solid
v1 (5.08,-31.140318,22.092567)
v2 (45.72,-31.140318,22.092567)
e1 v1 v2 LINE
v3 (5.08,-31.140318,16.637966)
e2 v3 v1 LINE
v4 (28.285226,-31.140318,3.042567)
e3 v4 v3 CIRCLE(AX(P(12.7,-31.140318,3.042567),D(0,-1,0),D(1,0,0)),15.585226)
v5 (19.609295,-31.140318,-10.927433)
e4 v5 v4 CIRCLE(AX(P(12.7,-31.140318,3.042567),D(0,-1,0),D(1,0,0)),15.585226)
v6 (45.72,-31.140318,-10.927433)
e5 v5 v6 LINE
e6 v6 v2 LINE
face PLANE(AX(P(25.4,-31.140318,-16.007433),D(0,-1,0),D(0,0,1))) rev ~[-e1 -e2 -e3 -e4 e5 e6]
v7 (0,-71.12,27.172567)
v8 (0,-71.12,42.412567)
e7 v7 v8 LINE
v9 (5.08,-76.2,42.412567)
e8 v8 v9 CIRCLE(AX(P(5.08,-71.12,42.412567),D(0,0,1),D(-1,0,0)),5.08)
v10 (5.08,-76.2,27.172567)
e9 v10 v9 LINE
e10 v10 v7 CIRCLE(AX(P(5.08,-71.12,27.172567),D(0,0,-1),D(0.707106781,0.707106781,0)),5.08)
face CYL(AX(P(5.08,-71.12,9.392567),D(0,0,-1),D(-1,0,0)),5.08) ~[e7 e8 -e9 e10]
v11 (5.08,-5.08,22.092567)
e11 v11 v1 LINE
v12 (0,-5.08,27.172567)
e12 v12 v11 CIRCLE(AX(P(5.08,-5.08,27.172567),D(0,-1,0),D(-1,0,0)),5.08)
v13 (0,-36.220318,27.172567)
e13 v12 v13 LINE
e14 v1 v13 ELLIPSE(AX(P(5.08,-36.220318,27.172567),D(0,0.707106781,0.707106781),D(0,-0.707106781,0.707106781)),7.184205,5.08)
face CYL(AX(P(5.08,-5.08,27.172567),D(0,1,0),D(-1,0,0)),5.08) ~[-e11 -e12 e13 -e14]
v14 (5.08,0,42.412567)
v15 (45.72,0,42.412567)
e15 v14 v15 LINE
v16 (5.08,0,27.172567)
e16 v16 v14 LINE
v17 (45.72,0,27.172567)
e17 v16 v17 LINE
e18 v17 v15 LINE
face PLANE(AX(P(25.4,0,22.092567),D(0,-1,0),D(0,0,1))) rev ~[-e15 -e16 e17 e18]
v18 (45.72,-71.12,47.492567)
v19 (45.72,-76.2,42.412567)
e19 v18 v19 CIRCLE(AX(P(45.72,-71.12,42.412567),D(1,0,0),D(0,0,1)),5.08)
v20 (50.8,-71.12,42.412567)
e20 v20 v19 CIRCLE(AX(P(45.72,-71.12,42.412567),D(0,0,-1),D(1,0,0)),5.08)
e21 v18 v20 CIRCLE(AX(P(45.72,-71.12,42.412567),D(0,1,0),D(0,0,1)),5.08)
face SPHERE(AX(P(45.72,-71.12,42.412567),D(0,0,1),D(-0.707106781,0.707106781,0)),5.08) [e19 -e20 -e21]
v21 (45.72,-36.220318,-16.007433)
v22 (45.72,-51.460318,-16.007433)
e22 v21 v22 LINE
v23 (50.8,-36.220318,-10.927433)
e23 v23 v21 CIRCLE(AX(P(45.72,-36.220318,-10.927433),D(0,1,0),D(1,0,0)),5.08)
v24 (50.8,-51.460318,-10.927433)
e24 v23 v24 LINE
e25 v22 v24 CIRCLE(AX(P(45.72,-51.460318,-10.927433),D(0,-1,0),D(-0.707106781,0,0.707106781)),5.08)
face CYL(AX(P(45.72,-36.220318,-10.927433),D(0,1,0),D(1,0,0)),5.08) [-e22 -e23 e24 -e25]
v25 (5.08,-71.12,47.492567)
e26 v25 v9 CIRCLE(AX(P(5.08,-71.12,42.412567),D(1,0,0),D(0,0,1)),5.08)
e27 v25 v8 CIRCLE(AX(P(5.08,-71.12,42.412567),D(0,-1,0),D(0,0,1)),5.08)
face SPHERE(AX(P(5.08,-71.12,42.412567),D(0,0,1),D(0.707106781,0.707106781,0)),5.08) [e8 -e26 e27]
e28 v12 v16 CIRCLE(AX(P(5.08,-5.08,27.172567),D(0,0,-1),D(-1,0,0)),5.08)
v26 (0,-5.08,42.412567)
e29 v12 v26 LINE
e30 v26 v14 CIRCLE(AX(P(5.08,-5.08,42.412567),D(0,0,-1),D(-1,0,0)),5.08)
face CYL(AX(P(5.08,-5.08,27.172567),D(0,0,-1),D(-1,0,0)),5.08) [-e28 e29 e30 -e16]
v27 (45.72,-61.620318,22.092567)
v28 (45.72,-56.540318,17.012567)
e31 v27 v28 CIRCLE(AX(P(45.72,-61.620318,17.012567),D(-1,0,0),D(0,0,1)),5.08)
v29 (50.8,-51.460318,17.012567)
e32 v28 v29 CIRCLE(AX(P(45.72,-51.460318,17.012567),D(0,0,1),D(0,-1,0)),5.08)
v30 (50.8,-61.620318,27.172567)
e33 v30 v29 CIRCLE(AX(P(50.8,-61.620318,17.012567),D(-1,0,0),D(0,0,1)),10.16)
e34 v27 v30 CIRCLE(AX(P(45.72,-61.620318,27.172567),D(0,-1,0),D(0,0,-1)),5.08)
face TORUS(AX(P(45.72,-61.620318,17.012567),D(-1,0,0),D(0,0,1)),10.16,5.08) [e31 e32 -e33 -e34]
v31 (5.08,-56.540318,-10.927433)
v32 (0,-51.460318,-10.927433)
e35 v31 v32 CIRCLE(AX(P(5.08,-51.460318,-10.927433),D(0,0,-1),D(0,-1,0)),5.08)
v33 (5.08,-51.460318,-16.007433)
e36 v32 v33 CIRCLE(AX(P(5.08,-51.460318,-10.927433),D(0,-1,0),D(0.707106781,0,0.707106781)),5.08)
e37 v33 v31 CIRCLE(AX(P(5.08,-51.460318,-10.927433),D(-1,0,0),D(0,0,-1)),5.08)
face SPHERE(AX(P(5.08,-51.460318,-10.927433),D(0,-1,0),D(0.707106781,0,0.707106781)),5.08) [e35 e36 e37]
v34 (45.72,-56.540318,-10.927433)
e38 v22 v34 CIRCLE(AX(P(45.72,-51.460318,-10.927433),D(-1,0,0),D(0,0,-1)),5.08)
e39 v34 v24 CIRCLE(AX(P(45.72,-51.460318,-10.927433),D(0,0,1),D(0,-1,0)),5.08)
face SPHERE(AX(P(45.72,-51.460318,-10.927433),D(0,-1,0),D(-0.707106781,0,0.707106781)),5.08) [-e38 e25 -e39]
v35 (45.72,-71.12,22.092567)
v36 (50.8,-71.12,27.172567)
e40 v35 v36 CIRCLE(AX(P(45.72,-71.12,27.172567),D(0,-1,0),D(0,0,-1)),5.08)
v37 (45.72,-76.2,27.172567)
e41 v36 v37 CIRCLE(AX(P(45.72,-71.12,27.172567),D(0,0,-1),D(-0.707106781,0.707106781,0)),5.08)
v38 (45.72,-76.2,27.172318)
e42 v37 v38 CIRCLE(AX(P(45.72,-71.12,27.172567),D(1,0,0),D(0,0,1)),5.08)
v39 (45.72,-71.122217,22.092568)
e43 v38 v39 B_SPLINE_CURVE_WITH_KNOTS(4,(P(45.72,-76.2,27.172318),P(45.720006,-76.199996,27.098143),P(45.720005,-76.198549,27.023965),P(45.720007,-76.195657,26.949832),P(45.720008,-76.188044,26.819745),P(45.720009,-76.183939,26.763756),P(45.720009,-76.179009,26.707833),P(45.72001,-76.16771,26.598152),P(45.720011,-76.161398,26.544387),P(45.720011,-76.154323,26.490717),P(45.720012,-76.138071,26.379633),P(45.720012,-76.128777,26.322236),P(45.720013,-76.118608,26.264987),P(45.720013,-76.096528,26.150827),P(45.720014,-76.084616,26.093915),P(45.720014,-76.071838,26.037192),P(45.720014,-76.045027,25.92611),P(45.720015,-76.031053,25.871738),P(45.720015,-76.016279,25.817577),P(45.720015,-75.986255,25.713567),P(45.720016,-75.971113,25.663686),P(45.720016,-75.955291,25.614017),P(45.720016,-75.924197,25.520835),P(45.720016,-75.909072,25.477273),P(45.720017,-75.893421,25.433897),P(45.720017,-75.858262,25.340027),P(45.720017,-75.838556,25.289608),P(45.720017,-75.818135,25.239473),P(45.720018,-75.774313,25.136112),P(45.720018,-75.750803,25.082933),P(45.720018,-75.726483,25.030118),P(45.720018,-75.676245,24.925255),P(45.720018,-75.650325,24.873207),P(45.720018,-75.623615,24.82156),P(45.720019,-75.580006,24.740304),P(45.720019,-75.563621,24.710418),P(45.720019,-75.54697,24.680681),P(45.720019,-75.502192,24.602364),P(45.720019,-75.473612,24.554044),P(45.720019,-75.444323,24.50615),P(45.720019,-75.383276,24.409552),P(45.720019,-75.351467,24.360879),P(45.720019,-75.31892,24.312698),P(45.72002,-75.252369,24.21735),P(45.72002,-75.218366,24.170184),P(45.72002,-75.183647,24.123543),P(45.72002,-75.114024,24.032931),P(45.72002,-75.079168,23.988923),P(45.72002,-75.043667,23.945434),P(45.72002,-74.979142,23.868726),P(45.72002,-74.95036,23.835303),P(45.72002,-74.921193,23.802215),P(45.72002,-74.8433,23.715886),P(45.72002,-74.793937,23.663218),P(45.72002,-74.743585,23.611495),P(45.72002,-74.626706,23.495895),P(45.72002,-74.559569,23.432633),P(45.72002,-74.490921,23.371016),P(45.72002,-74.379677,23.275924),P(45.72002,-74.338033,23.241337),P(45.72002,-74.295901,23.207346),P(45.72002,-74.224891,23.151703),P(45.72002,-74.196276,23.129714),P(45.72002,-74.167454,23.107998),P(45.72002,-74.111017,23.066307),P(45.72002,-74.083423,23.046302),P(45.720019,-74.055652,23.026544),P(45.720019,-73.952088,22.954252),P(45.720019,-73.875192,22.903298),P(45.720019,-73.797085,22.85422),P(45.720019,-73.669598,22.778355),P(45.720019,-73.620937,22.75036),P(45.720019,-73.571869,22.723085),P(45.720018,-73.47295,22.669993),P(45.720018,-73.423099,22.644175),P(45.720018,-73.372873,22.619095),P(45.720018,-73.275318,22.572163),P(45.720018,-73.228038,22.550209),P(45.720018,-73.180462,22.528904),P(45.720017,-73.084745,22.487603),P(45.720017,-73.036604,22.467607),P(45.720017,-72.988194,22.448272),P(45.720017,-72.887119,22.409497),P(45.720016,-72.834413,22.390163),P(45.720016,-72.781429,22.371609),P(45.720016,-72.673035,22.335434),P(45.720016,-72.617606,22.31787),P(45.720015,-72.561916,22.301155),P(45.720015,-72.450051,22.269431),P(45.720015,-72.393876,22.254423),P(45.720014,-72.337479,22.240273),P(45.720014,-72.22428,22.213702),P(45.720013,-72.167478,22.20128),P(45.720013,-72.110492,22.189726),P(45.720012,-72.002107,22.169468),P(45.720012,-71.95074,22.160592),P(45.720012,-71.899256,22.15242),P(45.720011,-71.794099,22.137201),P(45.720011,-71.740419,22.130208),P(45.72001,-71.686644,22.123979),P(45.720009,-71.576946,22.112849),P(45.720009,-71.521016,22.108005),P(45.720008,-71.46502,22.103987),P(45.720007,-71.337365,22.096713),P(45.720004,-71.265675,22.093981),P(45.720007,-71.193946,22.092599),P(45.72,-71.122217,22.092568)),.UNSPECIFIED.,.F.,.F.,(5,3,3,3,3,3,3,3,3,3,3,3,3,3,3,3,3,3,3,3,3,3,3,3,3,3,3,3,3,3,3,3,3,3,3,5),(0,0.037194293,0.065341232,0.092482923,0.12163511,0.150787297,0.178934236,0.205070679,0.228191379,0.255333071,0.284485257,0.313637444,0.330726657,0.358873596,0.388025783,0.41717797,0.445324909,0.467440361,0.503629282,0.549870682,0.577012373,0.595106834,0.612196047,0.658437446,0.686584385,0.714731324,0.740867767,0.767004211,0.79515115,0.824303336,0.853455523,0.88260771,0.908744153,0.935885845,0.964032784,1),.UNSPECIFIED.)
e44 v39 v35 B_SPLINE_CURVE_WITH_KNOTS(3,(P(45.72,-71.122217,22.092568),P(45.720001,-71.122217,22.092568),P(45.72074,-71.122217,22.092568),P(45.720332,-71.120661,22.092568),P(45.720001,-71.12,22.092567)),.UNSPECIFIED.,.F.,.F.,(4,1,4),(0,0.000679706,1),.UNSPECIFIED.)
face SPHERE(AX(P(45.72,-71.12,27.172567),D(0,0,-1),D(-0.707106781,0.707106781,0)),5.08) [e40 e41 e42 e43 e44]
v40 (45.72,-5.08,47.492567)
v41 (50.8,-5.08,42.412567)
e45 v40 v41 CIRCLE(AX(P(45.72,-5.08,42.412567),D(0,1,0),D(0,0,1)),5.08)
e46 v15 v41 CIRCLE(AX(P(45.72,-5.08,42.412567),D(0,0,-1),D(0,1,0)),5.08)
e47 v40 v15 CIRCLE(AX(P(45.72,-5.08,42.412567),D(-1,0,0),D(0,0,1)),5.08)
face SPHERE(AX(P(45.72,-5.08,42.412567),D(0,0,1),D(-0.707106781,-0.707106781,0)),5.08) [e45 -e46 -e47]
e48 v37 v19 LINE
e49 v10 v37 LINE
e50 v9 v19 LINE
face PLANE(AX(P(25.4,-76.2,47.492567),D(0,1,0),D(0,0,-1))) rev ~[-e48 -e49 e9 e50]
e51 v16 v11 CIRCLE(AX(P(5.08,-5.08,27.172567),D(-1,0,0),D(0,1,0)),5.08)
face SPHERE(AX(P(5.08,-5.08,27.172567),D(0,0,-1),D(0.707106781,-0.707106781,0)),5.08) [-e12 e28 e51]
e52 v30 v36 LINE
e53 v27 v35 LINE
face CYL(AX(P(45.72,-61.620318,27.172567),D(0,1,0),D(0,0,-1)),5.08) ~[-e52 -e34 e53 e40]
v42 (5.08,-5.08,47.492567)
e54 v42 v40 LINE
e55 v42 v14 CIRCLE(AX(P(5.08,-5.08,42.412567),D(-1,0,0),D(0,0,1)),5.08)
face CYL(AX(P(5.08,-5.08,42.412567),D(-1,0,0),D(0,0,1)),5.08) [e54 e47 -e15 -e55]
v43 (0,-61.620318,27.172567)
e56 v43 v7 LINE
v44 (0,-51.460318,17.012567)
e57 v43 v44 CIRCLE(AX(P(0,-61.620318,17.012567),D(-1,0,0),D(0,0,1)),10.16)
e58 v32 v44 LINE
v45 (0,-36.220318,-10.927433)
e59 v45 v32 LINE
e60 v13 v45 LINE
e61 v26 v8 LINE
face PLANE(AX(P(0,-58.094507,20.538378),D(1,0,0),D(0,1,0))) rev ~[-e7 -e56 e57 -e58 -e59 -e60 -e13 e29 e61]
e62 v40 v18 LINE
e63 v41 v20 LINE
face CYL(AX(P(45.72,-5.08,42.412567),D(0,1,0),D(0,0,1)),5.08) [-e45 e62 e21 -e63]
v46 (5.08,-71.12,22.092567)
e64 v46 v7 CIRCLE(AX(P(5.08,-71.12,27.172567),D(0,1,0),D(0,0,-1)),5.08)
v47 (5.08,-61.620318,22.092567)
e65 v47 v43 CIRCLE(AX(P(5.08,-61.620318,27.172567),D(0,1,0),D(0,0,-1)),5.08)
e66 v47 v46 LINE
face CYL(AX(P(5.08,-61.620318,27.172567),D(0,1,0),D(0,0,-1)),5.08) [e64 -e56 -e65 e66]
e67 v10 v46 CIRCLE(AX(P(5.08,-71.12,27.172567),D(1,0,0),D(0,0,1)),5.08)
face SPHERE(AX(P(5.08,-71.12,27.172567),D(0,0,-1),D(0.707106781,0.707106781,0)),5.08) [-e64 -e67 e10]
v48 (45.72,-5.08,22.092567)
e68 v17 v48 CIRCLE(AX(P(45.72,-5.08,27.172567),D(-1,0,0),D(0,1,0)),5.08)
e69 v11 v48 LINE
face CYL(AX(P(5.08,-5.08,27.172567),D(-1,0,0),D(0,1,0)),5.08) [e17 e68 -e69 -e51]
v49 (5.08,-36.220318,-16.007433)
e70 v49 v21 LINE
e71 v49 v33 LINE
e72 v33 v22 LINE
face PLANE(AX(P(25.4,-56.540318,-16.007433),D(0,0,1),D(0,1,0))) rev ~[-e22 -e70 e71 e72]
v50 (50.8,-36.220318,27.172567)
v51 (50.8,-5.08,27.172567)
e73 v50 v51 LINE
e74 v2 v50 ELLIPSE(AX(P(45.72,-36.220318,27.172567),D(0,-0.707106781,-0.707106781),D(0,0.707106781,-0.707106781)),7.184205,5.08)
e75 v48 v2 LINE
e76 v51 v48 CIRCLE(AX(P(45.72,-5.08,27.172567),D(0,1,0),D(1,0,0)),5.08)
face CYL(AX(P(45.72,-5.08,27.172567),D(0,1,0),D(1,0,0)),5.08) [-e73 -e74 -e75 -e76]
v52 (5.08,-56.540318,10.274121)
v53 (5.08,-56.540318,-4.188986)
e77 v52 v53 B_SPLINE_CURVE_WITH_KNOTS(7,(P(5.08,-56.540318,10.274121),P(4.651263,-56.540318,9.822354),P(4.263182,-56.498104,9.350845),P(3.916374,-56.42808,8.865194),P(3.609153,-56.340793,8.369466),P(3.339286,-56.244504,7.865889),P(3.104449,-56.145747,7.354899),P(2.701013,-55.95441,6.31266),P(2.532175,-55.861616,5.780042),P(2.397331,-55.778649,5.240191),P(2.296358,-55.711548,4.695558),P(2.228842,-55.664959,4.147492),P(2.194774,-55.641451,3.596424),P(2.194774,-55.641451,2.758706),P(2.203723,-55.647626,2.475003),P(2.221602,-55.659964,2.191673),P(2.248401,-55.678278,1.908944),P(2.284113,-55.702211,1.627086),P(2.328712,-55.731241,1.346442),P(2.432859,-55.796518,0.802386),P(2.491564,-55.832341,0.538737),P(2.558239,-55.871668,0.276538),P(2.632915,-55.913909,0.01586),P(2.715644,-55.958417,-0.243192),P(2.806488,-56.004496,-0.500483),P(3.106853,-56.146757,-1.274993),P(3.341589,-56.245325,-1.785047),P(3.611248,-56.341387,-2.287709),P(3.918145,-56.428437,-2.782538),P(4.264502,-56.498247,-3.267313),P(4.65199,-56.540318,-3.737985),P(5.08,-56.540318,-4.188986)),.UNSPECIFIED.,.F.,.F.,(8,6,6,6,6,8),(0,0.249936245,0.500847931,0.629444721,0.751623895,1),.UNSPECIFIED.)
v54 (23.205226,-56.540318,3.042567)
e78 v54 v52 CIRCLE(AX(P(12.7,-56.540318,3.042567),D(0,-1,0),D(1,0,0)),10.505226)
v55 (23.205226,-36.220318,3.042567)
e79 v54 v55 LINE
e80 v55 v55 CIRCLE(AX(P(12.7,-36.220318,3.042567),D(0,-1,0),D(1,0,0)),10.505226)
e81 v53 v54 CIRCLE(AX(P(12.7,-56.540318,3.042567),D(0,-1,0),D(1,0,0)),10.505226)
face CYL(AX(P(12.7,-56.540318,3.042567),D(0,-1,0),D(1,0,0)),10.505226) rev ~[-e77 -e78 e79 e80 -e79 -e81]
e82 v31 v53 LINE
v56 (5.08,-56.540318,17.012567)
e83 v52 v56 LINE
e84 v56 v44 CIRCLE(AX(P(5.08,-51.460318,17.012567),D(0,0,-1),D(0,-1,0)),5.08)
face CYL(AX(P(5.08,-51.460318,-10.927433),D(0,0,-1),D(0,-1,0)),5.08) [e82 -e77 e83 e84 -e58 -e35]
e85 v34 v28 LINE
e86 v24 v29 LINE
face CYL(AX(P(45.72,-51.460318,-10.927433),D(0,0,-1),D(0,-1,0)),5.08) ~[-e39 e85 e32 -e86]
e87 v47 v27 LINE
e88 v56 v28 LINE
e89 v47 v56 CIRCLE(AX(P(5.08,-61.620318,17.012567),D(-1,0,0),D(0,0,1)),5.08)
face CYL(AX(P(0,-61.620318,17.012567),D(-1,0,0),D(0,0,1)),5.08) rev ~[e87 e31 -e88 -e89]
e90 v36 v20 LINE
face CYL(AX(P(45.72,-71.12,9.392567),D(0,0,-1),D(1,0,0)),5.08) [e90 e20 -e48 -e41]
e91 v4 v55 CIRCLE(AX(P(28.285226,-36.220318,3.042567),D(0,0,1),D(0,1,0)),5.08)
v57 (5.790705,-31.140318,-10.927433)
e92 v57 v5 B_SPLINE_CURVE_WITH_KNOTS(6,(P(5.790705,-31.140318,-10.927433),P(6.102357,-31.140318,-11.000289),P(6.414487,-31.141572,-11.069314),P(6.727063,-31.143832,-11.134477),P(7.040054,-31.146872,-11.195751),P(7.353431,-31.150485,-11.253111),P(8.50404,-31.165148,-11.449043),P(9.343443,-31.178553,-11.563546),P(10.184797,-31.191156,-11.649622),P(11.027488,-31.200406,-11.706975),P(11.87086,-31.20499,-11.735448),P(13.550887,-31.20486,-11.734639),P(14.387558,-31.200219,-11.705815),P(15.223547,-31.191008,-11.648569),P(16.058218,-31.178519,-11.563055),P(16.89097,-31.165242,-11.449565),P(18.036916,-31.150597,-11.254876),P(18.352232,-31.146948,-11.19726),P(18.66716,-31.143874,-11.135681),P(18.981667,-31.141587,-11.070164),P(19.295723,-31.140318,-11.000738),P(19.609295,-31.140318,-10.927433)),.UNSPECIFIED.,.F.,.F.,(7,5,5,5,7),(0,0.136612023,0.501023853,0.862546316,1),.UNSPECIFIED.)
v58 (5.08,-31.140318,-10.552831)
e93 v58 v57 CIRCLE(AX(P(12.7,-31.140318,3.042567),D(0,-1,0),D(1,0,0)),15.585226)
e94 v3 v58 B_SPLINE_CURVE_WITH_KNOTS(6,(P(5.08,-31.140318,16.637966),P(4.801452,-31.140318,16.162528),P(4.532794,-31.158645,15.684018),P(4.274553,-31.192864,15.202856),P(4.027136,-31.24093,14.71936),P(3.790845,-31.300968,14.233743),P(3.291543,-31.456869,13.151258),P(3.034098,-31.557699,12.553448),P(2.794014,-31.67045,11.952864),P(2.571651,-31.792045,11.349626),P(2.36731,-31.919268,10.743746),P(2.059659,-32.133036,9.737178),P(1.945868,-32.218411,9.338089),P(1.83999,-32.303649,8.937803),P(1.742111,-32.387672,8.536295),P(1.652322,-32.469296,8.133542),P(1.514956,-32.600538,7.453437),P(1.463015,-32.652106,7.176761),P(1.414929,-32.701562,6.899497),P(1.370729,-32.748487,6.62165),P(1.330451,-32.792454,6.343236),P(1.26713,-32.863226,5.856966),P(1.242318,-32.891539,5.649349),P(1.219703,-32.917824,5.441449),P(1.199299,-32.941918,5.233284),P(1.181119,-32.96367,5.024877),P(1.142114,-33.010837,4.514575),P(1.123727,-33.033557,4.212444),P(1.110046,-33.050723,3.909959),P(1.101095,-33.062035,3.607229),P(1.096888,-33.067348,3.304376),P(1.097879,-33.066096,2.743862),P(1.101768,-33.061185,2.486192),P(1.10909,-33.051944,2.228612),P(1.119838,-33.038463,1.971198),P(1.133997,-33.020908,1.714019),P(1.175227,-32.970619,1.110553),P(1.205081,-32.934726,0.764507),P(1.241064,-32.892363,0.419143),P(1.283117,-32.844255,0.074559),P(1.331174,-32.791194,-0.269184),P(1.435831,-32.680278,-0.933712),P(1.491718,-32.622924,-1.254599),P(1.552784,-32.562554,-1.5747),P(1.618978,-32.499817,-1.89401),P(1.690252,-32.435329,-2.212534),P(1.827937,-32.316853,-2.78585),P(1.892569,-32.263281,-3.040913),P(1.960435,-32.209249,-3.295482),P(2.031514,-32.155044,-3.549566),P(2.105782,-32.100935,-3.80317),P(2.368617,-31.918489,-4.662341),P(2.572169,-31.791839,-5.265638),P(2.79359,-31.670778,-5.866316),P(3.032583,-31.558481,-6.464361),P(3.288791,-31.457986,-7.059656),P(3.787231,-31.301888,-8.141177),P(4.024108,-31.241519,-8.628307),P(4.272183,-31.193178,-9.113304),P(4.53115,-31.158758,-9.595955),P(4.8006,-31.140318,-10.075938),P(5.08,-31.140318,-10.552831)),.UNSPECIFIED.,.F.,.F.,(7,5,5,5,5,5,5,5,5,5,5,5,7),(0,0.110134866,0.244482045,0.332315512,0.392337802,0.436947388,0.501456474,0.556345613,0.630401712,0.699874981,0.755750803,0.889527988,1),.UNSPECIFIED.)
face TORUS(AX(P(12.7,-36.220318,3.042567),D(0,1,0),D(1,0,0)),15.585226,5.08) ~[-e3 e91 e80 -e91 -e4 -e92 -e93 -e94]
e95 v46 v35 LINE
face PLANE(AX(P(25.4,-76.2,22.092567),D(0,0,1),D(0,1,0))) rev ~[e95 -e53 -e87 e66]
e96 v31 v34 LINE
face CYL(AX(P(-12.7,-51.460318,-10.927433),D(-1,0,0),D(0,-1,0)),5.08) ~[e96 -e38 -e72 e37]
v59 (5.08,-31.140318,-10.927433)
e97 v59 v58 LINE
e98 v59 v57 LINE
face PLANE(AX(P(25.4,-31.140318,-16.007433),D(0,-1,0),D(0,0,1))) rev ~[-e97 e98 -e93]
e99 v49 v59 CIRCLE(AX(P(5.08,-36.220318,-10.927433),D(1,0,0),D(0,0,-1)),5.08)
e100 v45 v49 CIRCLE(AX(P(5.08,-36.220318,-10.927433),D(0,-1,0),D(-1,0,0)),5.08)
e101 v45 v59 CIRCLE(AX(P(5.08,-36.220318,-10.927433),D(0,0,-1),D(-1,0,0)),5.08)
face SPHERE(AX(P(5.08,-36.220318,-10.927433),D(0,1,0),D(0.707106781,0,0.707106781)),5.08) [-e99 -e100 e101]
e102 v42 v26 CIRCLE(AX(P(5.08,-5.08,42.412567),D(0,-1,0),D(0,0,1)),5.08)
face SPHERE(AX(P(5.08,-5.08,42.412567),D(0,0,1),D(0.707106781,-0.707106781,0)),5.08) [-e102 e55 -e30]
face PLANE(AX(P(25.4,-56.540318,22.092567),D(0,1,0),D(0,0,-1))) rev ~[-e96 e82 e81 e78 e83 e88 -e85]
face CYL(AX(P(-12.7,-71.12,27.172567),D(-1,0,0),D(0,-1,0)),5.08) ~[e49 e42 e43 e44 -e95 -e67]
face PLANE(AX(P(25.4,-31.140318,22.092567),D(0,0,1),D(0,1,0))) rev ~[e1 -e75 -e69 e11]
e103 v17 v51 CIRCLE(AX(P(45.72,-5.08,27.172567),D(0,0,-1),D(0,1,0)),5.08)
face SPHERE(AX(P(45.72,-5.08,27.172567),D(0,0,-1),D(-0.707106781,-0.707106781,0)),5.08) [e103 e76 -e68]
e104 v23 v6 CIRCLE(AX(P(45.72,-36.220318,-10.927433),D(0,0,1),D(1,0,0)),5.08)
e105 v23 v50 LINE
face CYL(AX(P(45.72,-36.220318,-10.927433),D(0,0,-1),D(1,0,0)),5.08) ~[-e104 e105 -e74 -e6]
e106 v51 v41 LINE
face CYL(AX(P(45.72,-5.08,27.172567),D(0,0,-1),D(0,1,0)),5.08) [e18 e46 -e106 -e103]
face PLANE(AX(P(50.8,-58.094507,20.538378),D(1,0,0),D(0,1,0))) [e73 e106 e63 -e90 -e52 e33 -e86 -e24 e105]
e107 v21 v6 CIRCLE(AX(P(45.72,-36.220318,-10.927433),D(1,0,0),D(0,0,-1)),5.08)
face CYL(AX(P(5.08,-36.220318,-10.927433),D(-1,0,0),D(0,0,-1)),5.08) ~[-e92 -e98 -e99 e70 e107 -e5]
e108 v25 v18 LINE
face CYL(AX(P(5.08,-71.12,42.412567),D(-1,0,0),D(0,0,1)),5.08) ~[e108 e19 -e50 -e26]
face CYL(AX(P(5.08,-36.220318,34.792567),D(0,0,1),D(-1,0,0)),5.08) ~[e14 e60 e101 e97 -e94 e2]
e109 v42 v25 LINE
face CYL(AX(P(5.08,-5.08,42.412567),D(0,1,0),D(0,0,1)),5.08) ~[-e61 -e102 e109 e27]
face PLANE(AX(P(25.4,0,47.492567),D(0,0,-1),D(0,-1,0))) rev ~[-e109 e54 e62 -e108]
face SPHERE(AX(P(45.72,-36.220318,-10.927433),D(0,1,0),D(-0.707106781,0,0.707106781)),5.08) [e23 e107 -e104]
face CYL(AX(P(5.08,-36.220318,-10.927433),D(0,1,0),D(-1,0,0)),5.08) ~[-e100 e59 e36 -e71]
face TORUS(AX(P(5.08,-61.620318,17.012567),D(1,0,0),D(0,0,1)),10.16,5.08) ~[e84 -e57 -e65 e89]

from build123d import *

# Parameters (mm, degrees)
F0_W          = 25.4
F0_H          = 25.4
F1_DEPTH      = 76.2
F2_W          = 25.4
F2_H          = 25.4
F3_DEPTH      = 38.1
F4_R          = 10.5052255275
F5_DEPTH      = 56.5413178334
F7_DEPTH      = 25.4
F8_T1_DEPTH   = 50.8
F8_T3_DEPTH   = 33.02
F8_T5_DEPTH   = 33.02
F8_T7_DEPTH   = 26.0603178334
F8_T9_DEPTH   = 15.24
F8_T11_DEPTH  = 66.04
F8_T13_DEPTH  = 33.02
F8_T15_DEPTH  = 76.2
F8_T17_DEPTH  = 40.64
F8_S21_W      = 5.08
F8_S21_H      = 5.08
F8_T22_DEPTH  = 5.08
F8_S27_W      = 5.08
F8_S27_H      = 5.08
F8_T28_DEPTH  = 5.08
F8_S33_W      = 5.08
F8_S33_H      = 5.08
F8_T34_DEPTH  = 5.08
F8_S39_W      = 5.08
F8_S39_H      = 5.08
F8_T40_DEPTH  = 5.08
F8_S45_W      = 5.08
F8_S45_H      = 5.08
F8_T46_DEPTH  = 5.08
F8_S51_W      = 5.08
F8_S51_H      = 5.08
F8_T52_DEPTH  = 5.08
F8_S57_W      = 5.08
F8_S57_H      = 5.08
F8_T58_DEPTH  = 5.08
F8_S63_W      = 5.08
F8_S63_H      = 5.08
F8_T64_DEPTH  = 5.08
F8_T73_DEPTH  = 45.72
F8_T77_DEPTH  = 38.7603178334
F8_T84_DEPTH  = 45.72
F8_T88_DEPTH  = 38.7603178334
F8_T91_DEPTH  = 27.94
F8_T93_DEPTH  = 9.4996821666
F8_S97_W      = 5.08
F8_S97_H      = 5.08
F8_T98_DEPTH  = 5.08
F8_S103_W     = 5.08
F8_S103_H     = 5.08
F8_T104_DEPTH = 5.08
F8_S109_W     = 5.08
F8_S109_H     = 5.08
F8_T110_DEPTH = 5.08
F8_S115_W     = 5.08
F8_S115_H     = 5.08
F8_T116_DEPTH = 5.08
F8_T120_ANGLE = 90
F8_T122_ANGLE = 90


# Not quite as in the source:
# - a fillet or chamfer that OpenCascade refuses, or shapes differently, is made with other operations: its cross-section is extruded or revolved along the edge and cut away or added


with BuildPart() as f1:
    # F0 (on Front) → F1 (new body)
    with BuildSketch(Plane.XZ):
        with Locations((12.7, 34.7925674498)):
            Rectangle(F0_W, F0_H)
    extrude(amount=F1_DEPTH)

    # F2 (on face) → F3 (join)
    with BuildSketch(Plane(origin=(0, 0, 22.0925674498), x_dir=(1, 0, 0), z_dir=(0, 0, -1))):
        with Locations((12.7, 43.8403178334)):
            Rectangle(F2_W, F2_H)
    extrude(amount=F3_DEPTH)

    # F4 (on face) → F5 (cut, through all)
    with BuildSketch(Plane.XZ.offset(56.5403178334)):
        with Locations((12.7, 3.0425674498)):
            Circle(F4_R)
    extrude(amount=-F5_DEPTH, mode=Mode.SUBTRACT)

    # F6 (on face) → F7 (join)
    with BuildSketch(Plane.YZ.offset(25.4)):
        Polygon((-31.1403178334, -16.0074325502), (-31.1403178334, 22.0925674498), (0, 22.0925674498), (0, 47.4925674498), (-76.2, 47.4925674498), (-76.2, 22.0925674498), (-56.5403178334, 22.0925674498), (-56.5403178334, -16.0074325502), align=None)
    extrude(amount=F7_DEPTH)

    # F8: fillet of radius 5.08 on 24 edges, made by hand

    # F8_s2 → F8_t1 (join)
    with BuildSketch(Plane.YZ):
        with BuildLine():
            ThreePointArc((-61.6203178334, 22.0925674498), (-58.028215385, 20.6046698982), (-56.5403178334, 17.0125674498))
            Line((-56.5403178334, 17.0125674498), (-56.5403178334, 22.0925674498))
            Line((-56.5403178334, 22.0925674498), (-61.6203178334, 22.0925674498))
        make_face()
    extrude(amount=F8_T1_DEPTH)

    # F8_s4 → F8_t3 (cut)
    with BuildSketch(Plane.XZ.offset(36.2203178334)):
        with BuildLine():
            ThreePointArc((50.8, -10.9274325502), (49.3121024484, -14.5195349986), (45.72, -16.0074325502))
            Line((45.72, -16.0074325502), (50.8, -16.0074325502))
            Line((50.8, -16.0074325502), (50.8, -10.9274325502))
        make_face()
        with BuildLine():
            ThreePointArc((0, -10.9274325502), (1.4878975516, -14.5195349986), (5.08, -16.0074325502))
            Line((5.08, -16.0074325502), (0, -16.0074325502))
            Line((0, -16.0074325502), (0, -10.9274325502))
        make_face()
    extrude(amount=F8_T3_DEPTH, mode=Mode.SUBTRACT)

    # F8_s6 → F8_t5 (cut)
    with BuildSketch(Plane.XY.offset(-10.9274325502)):
        with BuildLine():
            ThreePointArc((50.8, -36.2203178334), (49.3121024484, -32.628215385), (45.72, -31.1403178334))
            Line((45.72, -31.1403178334), (50.8, -31.1403178334))
            Line((50.8, -31.1403178334), (50.8, -36.2203178334))
        make_face()
        with BuildLine():
            ThreePointArc((0, -36.2203178334), (1.4878975516, -32.628215385), (5.08, -31.1403178334))
            Line((5.08, -31.1403178334), (0, -31.1403178334))
            Line((0, -31.1403178334), (0, -36.2203178334))
        make_face()
    extrude(amount=F8_T5_DEPTH, mode=Mode.SUBTRACT)

    # F8_s8 → F8_t7 (cut)
    with BuildSketch(Plane.XZ.offset(5.08)):
        with BuildLine():
            ThreePointArc((50.8, 27.1725674498), (49.3121024484, 23.5804650014), (45.72, 22.0925674498))
            Line((45.72, 22.0925674498), (50.8, 22.0925674498))
            Line((50.8, 22.0925674498), (50.8, 27.1725674498))
        make_face()
        with BuildLine():
            ThreePointArc((0, 27.1725674498), (1.4878975516, 23.5804650014), (5.08, 22.0925674498))
            Line((5.08, 22.0925674498), (0, 22.0925674498))
            Line((0, 22.0925674498), (0, 27.1725674498))
        make_face()
    extrude(amount=F8_T7_DEPTH, mode=Mode.SUBTRACT)

    # F8_s10 → F8_t9 (cut)
    with BuildSketch(Plane.XY.offset(27.1725674498)):
        with BuildLine():
            ThreePointArc((45.72, 0), (49.3121024484, -1.4878975516), (50.8, -5.08))
            Line((50.8, -5.08), (50.8, 0))
            Line((50.8, 0), (45.72, 0))
        make_face()
        with BuildLine():
            ThreePointArc((0, -5.08), (1.4878975516, -1.4878975516), (5.08, 0))
            Line((5.08, 0), (0, 0))
            Line((0, 0), (0, -5.08))
        make_face()
    extrude(amount=F8_T9_DEPTH, mode=Mode.SUBTRACT)

    # F8_s12 → F8_t11 (cut)
    with BuildSketch(Plane.XZ.offset(5.08)):
        with BuildLine():
            ThreePointArc((45.72, 47.4925674498), (49.3121024484, 46.0046698982), (50.8, 42.4125674498))
            Line((50.8, 42.4125674498), (50.8, 47.4925674498))
            Line((50.8, 47.4925674498), (45.72, 47.4925674498))
        make_face()
        with BuildLine():
            ThreePointArc((5.08, 47.4925674498), (1.4878975516, 46.0046698982), (0, 42.4125674498))
            Line((0, 42.4125674498), (0, 47.4925674498))
            Line((0, 47.4925674498), (5.08, 47.4925674498))
        make_face()
    extrude(amount=F8_T11_DEPTH, mode=Mode.SUBTRACT)

    # F8_s14 → F8_t13 (cut)
    with BuildSketch(Plane.XY.offset(9.3925674498)):
        with BuildLine():
            ThreePointArc((50.8, -71.12), (49.3121024484, -74.7121024484), (45.72, -76.2))
            Line((45.72, -76.2), (50.8, -76.2))
            Line((50.8, -76.2), (50.8, -71.12))
        make_face()
        with BuildLine():
            ThreePointArc((0, -71.12), (1.4878975516, -74.7121024484), (5.08, -76.2))
            Line((5.08, -76.2), (0, -76.2))
            Line((0, -76.2), (0, -71.12))
        make_face()
    extrude(amount=F8_T13_DEPTH, mode=Mode.SUBTRACT)

    # F8_s16 → F8_t15 (cut)
    with BuildSketch(Plane.YZ.offset(-12.7)):
        with BuildLine():
            ThreePointArc((-56.5403178334, -10.9274325502), (-55.0524202819, -14.5195349986), (-51.4603178334, -16.0074325502))
            Line((-51.4603178334, -16.0074325502), (-56.5403178334, -16.0074325502))
            Line((-56.5403178334, -16.0074325502), (-56.5403178334, -10.9274325502))
        make_face()
        with BuildLine():
            ThreePointArc((-76.2, 27.1725674498), (-74.7121024484, 23.5804650014), (-71.12, 22.0925674498))
            Line((-71.12, 22.0925674498), (-76.2, 22.0925674498))
            Line((-76.2, 22.0925674498), (-76.2, 27.1725674498))
        make_face()
    extrude(amount=F8_T15_DEPTH, mode=Mode.SUBTRACT)

    # F8_s18 → F8_t17 (cut)
    with BuildSketch(Plane.YZ.offset(5.08)):
        with BuildLine():
            ThreePointArc((0, 27.1725674498), (-1.4878975516, 23.5804650014), (-5.08, 22.0925674498))
            Line((-5.08, 22.0925674498), (0, 22.0925674498))
            Line((0, 22.0925674498), (0, 27.1725674498))
        make_face()
        with BuildLine():
            ThreePointArc((-36.2203178334, -16.0074325502), (-32.628215385, -14.5195349986), (-31.1403178334, -10.9274325502))
            Line((-31.1403178334, -10.9274325502), (-31.1403178334, -16.0074325502))
            Line((-31.1403178334, -16.0074325502), (-36.2203178334, -16.0074325502))
        make_face()
        with BuildLine():
            ThreePointArc((-5.08, 47.4925674498), (-1.4878975516, 46.0046698982), (0, 42.4125674498))
            Line((0, 42.4125674498), (0, 47.4925674498))
            Line((0, 47.4925674498), (-5.08, 47.4925674498))
        make_face()
        with BuildLine():
            ThreePointArc((-71.12, 47.4925674498), (-74.7121024484, 46.0046698982), (-76.2, 42.4125674498))
            Line((-76.2, 42.4125674498), (-76.2, 47.4925674498))
            Line((-76.2, 47.4925674498), (-71.12, 47.4925674498))
        make_face()
    extrude(amount=F8_T17_DEPTH, mode=Mode.SUBTRACT)


with BuildPart() as f8_tool20:
    # F8_s21 → F8_t22 (new body)
    with BuildSketch(Plane.XZ.offset(36.2203178334)):
        with Locations((48.26, -13.4674325502)):
            Rectangle(F8_S21_W, F8_S21_H)
    extrude(amount=-F8_T22_DEPTH)

    # F8_s23 → F8_t24 (revolve, cut)
    with BuildSketch(Plane(origin=(45.72, -36.2203178334, -10.9274325502), x_dir=(-0.7071067812, 0, 0.7071067812), z_dir=(-0.7071067812, 0, -0.7071067812))):
        with BuildLine():
            ThreePointArc((0, -5.08), (5.08, 0), (0, 5.08))
            Line((0, 5.08), (0, -5.08))
        make_face()
    revolve(axis=Axis((45.72, -36.2203178334, -10.9274325502), (0, 1, 0)), mode=Mode.SUBTRACT)


with BuildPart() as f1_1:
    add(f1.part)

    # F8_t19: cut F8_tool20
    add(f8_tool20.part, mode=Mode.SUBTRACT)


with BuildPart() as f8_tool26:
    # F8_s27 → F8_t28 (new body)
    with BuildSketch(Plane.XY.offset(27.1725674498)):
        with Locations((48.26, -2.54)):
            Rectangle(F8_S27_W, F8_S27_H)
    extrude(amount=-F8_T28_DEPTH)

    # F8_s29 → F8_t30 (revolve, cut)
    with BuildSketch(Plane(origin=(45.72, -5.08, 27.1725674498), x_dir=(-0.7071067812, -0.7071067812, 0), z_dir=(0.7071067812, -0.7071067812, 0))):
        with BuildLine():
            ThreePointArc((0, -5.08), (5.08, 0), (0, 5.08))
            Line((0, 5.08), (0, -5.08))
        make_face()
    revolve(axis=Axis((45.72, -5.08, 27.1725674498), (0, 0, -1)), mode=Mode.SUBTRACT)


with BuildPart() as f1_2:
    add(f1_1.part)

    # F8_t25: cut F8_tool26
    add(f8_tool26.part, mode=Mode.SUBTRACT)


with BuildPart() as f8_tool32:
    # F8_s33 → F8_t34 (new body)
    with BuildSketch(Plane.XY.offset(42.4125674498)):
        with Locations((48.26, -2.54)):
            Rectangle(F8_S33_W, F8_S33_H)
    extrude(amount=F8_T34_DEPTH)

    # F8_s35 → F8_t36 (revolve, cut)
    with BuildSketch(Plane(origin=(45.72, -5.08, 42.4125674498), x_dir=(-0.7071067812, -0.7071067812, 0), z_dir=(-0.7071067812, 0.7071067812, 0))):
        with BuildLine():
            ThreePointArc((0, -5.08), (5.08, 0), (0, 5.08))
            Line((0, 5.08), (0, -5.08))
        make_face()
    revolve(axis=Axis((45.72, -5.08, 42.4125674498), (0, 0, 1)), mode=Mode.SUBTRACT)


with BuildPart() as f1_3:
    add(f1_2.part)

    # F8_t31: cut F8_tool32
    add(f8_tool32.part, mode=Mode.SUBTRACT)


with BuildPart() as f8_tool38:
    # F8_s39 → F8_t40 (new body)
    with BuildSketch(Plane.XY.offset(42.4125674498)):
        with Locations((48.26, -73.66)):
            Rectangle(F8_S39_W, F8_S39_H)
    extrude(amount=F8_T40_DEPTH)

    # F8_s41 → F8_t42 (revolve, cut)
    with BuildSketch(Plane(origin=(45.72, -71.12, 42.4125674498), x_dir=(-0.7071067812, 0.7071067812, 0), z_dir=(0.7071067812, 0.7071067812, 0))):
        with BuildLine():
            ThreePointArc((0, -5.08), (5.08, 0), (0, 5.08))
            Line((0, 5.08), (0, -5.08))
        make_face()
    revolve(axis=Axis((45.72, -71.12, 42.4125674498), (0, 0, 1)), mode=Mode.SUBTRACT)


with BuildPart() as f1_4:
    add(f1_3.part)

    # F8_t37: cut F8_tool38
    add(f8_tool38.part, mode=Mode.SUBTRACT)


with BuildPart() as f8_tool44:
    # F8_s45 → F8_t46 (new body)
    with BuildSketch(Plane.XY.offset(27.1725674498)):
        with Locations((2.54, -2.54)):
            Rectangle(F8_S45_W, F8_S45_H)
    extrude(amount=-F8_T46_DEPTH)

    # F8_s47 → F8_t48 (revolve, cut)
    with BuildSketch(Plane(origin=(5.08, -5.08, 27.1725674498), x_dir=(0.7071067812, -0.7071067812, 0), z_dir=(0.7071067812, 0.7071067812, 0))):
        with BuildLine():
            ThreePointArc((0, -5.08), (5.08, 0), (0, 5.08))
            Line((0, 5.08), (0, -5.08))
        make_face()
    revolve(axis=Axis((5.08, -5.08, 27.1725674498), (0, 0, -1)), mode=Mode.SUBTRACT)


with BuildPart() as f1_5:
    add(f1_4.part)

    # F8_t43: cut F8_tool44
    add(f8_tool44.part, mode=Mode.SUBTRACT)


with BuildPart() as f8_tool50:
    # F8_s51 → F8_t52 (new body)
    with BuildSketch(Plane.XZ.offset(36.2203178334)):
        with Locations((2.54, -13.4674325502)):
            Rectangle(F8_S51_W, F8_S51_H)
    extrude(amount=-F8_T52_DEPTH)

    # F8_s53 → F8_t54 (revolve, cut)
    with BuildSketch(Plane(origin=(5.08, -36.2203178334, -10.9274325502), x_dir=(0.7071067812, 0, 0.7071067812), z_dir=(-0.7071067812, 0, 0.7071067812))):
        with BuildLine():
            ThreePointArc((0, -5.08), (5.08, 0), (0, 5.08))
            Line((0, 5.08), (0, -5.08))
        make_face()
    revolve(axis=Axis((5.08, -36.2203178334, -10.9274325502), (0, 1, 0)), mode=Mode.SUBTRACT)


with BuildPart() as f1_6:
    add(f1_5.part)

    # F8_t49: cut F8_tool50
    add(f8_tool50.part, mode=Mode.SUBTRACT)


with BuildPart() as f8_tool56:
    # F8_s57 → F8_t58 (new body)
    with BuildSketch(Plane.XY.offset(42.4125674498)):
        with Locations((2.54, -2.54)):
            Rectangle(F8_S57_W, F8_S57_H)
    extrude(amount=F8_T58_DEPTH)

    # F8_s59 → F8_t60 (revolve, cut)
    with BuildSketch(Plane(origin=(5.08, -5.08, 42.4125674498), x_dir=(0.7071067812, -0.7071067812, 0), z_dir=(-0.7071067812, -0.7071067812, 0))):
        with BuildLine():
            ThreePointArc((0, -5.08), (5.08, 0), (0, 5.08))
            Line((0, 5.08), (0, -5.08))
        make_face()
    revolve(axis=Axis((5.08, -5.08, 42.4125674498), (0, 0, 1)), mode=Mode.SUBTRACT)


with BuildPart() as f1_7:
    add(f1_6.part)

    # F8_t55: cut F8_tool56
    add(f8_tool56.part, mode=Mode.SUBTRACT)


with BuildPart() as f8_tool62:
    # F8_s63 → F8_t64 (new body)
    with BuildSketch(Plane.XY.offset(42.4125674498)):
        with Locations((2.54, -73.66)):
            Rectangle(F8_S63_W, F8_S63_H)
    extrude(amount=F8_T64_DEPTH)

    # F8_s65 → F8_t66 (revolve, cut)
    with BuildSketch(Plane(origin=(5.08, -71.12, 42.4125674498), x_dir=(0.7071067812, 0.7071067812, 0), z_dir=(0.7071067812, -0.7071067812, 0))):
        with BuildLine():
            ThreePointArc((0, -5.08), (5.08, 0), (0, 5.08))
            Line((0, 5.08), (0, -5.08))
        make_face()
    revolve(axis=Axis((5.08, -71.12, 42.4125674498), (0, 0, 1)), mode=Mode.SUBTRACT)


with BuildPart() as f1_8:
    add(f1_7.part)

    # F8_t61: cut F8_tool62
    add(f8_tool62.part, mode=Mode.SUBTRACT)

    # F8_s67 → F8_t68 (revolve, cut)
    with BuildSketch(Plane.XY.offset(3.0425674498)):
        with BuildLine():
            ThreePointArc((28.2852255275, -31.1403178334), (24.693123079, -32.628215385), (23.2052255275, -36.2203178334))
            Line((23.2052255275, -36.2203178334), (23.2052255275, -31.1403178334))
            Line((23.2052255275, -31.1403178334), (28.2852255275, -31.1403178334))
        make_face()
    revolve(axis=Axis((12.7, -31.1403178334, 3.0425674498), (0, -1, 0)), mode=Mode.SUBTRACT)


with BuildPart() as f8_tool71:
    # F8_s72 → F8_t73 (new body)
    with BuildSketch(Plane.XY.offset(-10.9274325502)):
        with BuildLine():
            ThreePointArc((50.8, -36.2203178334), (49.3121024484, -32.628215385), (45.72, -31.1403178334))
            Line((45.72, -31.1403178334), (50.8, -31.1403178334))
            Line((50.8, -31.1403178334), (50.8, -36.2203178334))
        make_face()
    extrude(amount=F8_T73_DEPTH)

    split(bisect_by=Plane.XY.offset(22.0925674498), keep=Keep.TOP)


with BuildPart() as f8_tool75:
    # F8_s76 → F8_t77 (new body)
    with BuildSketch(Plane.XZ.offset(43.8403178334)):
        with BuildLine():
            ThreePointArc((50.8, 27.1725674498), (49.3121024484, 23.5804650014), (45.72, 22.0925674498))
            Line((45.72, 22.0925674498), (50.8, 22.0925674498))
            Line((50.8, 22.0925674498), (50.8, 27.1725674498))
        make_face()
    extrude(amount=-F8_T77_DEPTH)

    split(bisect_by=Plane.XZ.offset(31.1403178334), keep=Keep.TOP)


with BuildPart() as f8_tool71_1:
    add(f8_tool71.part)

    # F8_t79: intersect F8_tool75
    add(f8_tool75.part, mode=Mode.INTERSECT)


with BuildPart() as f1_9:
    add(f1_8.part)

    # F8_t69: cut F8_tool71
    add(f8_tool71_1.part, mode=Mode.SUBTRACT)


with BuildPart() as f8_tool82:
    # F8_s83 → F8_t84 (new body)
    with BuildSketch(Plane.XY.offset(34.7925674498)):
        with BuildLine():
            ThreePointArc((0, -36.2203178334), (1.4878975516, -32.628215385), (5.08, -31.1403178334))
            Line((5.08, -31.1403178334), (0, -31.1403178334))
            Line((0, -31.1403178334), (0, -36.2203178334))
        make_face()
    extrude(amount=-F8_T84_DEPTH)

    split(bisect_by=Plane.XY.offset(22.0925674498), keep=Keep.TOP)


with BuildPart() as f8_tool86:
    # F8_s87 → F8_t88 (new body)
    with BuildSketch(Plane.XZ.offset(5.08)):
        with BuildLine():
            ThreePointArc((0, 27.1725674498), (1.4878975516, 23.5804650014), (5.08, 22.0925674498))
            Line((5.08, 22.0925674498), (0, 22.0925674498))
            Line((0, 22.0925674498), (0, 27.1725674498))
        make_face()
    extrude(amount=F8_T88_DEPTH)

    split(bisect_by=Plane.XZ.offset(31.1403178334), keep=Keep.TOP)


with BuildPart() as f8_tool82_1:
    add(f8_tool82.part)

    # F8_t90: intersect F8_tool86
    add(f8_tool86.part, mode=Mode.INTERSECT)


with BuildPart() as f1_10:
    add(f1_9.part)

    # F8_t80: cut F8_tool82
    add(f8_tool82_1.part, mode=Mode.SUBTRACT)

    # F8_s92 → F8_t91 (cut)
    with BuildSketch(Plane.XY.offset(-10.9274325502)):
        with BuildLine():
            ThreePointArc((45.72, -56.5403178334), (49.3121024484, -55.0524202819), (50.8, -51.4603178334))
            Line((50.8, -51.4603178334), (50.8, -56.5403178334))
            Line((50.8, -56.5403178334), (45.72, -56.5403178334))
        make_face()
        with BuildLine():
            ThreePointArc((5.08, -56.5403178334), (1.4878975516, -55.0524202819), (0, -51.4603178334))
            Line((0, -51.4603178334), (0, -56.5403178334))
            Line((0, -56.5403178334), (5.08, -56.5403178334))
        make_face()
    extrude(amount=F8_T91_DEPTH, mode=Mode.SUBTRACT)

    # F8_s94 → F8_t93 (cut)
    with BuildSketch(Plane.XZ.offset(61.6203178334)):
        with BuildLine():
            ThreePointArc((45.72, 22.0925674498), (49.3121024484, 23.5804650014), (50.8, 27.1725674498))
            Line((50.8, 27.1725674498), (50.8, 22.0925674498))
            Line((50.8, 22.0925674498), (45.72, 22.0925674498))
        make_face()
        with BuildLine():
            ThreePointArc((5.08, 22.0925674498), (1.4878975516, 23.5804650014), (0, 27.1725674498))
            Line((0, 27.1725674498), (0, 22.0925674498))
            Line((0, 22.0925674498), (5.08, 22.0925674498))
        make_face()
    extrude(amount=F8_T93_DEPTH, mode=Mode.SUBTRACT)


with BuildPart() as f8_tool96:
    # F8_s97 → F8_t98 (new body)
    with BuildSketch(Plane.XZ.offset(51.4603178334)):
        with Locations((2.54, -13.4674325502)):
            Rectangle(F8_S97_W, F8_S97_H)
    extrude(amount=F8_T98_DEPTH)

    # F8_s99 → F8_t100 (revolve, cut)
    with BuildSketch(Plane(origin=(5.08, -51.4603178334, -10.9274325502), x_dir=(0.7071067812, 0, 0.7071067812), z_dir=(0.7071067812, 0, -0.7071067812))):
        with BuildLine():
            ThreePointArc((0, -5.08), (5.08, 0), (0, 5.08))
            Line((0, 5.08), (0, -5.08))
        make_face()
    revolve(axis=Axis((5.08, -51.4603178334, -10.9274325502), (0, -1, 0)), mode=Mode.SUBTRACT)


with BuildPart() as f1_11:
    add(f1_10.part)

    # F8_t95: cut F8_tool96
    add(f8_tool96.part, mode=Mode.SUBTRACT)


with BuildPart() as f8_tool102:
    # F8_s103 → F8_t104 (new body)
    with BuildSketch(Plane.XY.offset(27.1725674498)):
        with Locations((2.54, -73.66)):
            Rectangle(F8_S103_W, F8_S103_H)
    extrude(amount=-F8_T104_DEPTH)

    # F8_s105 → F8_t106 (revolve, cut)
    with BuildSketch(Plane(origin=(5.08, -71.12, 27.1725674498), x_dir=(0.7071067812, 0.7071067812, 0), z_dir=(-0.7071067812, 0.7071067812, 0))):
        with BuildLine():
            ThreePointArc((0, -5.08), (5.08, 0), (0, 5.08))
            Line((0, 5.08), (0, -5.08))
        make_face()
    revolve(axis=Axis((5.08, -71.12, 27.1725674498), (0, 0, -1)), mode=Mode.SUBTRACT)


with BuildPart() as f1_12:
    add(f1_11.part)

    # F8_t101: cut F8_tool102
    add(f8_tool102.part, mode=Mode.SUBTRACT)


with BuildPart() as f8_tool108:
    # F8_s109 → F8_t110 (new body)
    with BuildSketch(Plane.XY.offset(27.1725674498)):
        with Locations((48.26, -73.66)):
            Rectangle(F8_S109_W, F8_S109_H)
    extrude(amount=-F8_T110_DEPTH)

    # F8_s111 → F8_t112 (revolve, cut)
    with BuildSketch(Plane(origin=(45.72, -71.12, 27.1725674498), x_dir=(-0.7071067812, 0.7071067812, 0), z_dir=(-0.7071067812, -0.7071067812, 0))):
        with BuildLine():
            ThreePointArc((0, -5.08), (5.08, 0), (0, 5.08))
            Line((0, 5.08), (0, -5.08))
        make_face()
    revolve(axis=Axis((45.72, -71.12, 27.1725674498), (0, 0, -1)), mode=Mode.SUBTRACT)


with BuildPart() as f1_13:
    add(f1_12.part)

    # F8_t107: cut F8_tool108
    add(f8_tool108.part, mode=Mode.SUBTRACT)


with BuildPart() as f8_tool114:
    # F8_s115 → F8_t116 (new body)
    with BuildSketch(Plane.XZ.offset(51.4603178334)):
        with Locations((48.26, -13.4674325502)):
            Rectangle(F8_S115_W, F8_S115_H)
    extrude(amount=F8_T116_DEPTH)

    # F8_s117 → F8_t118 (revolve, cut)
    with BuildSketch(Plane(origin=(45.72, -51.4603178334, -10.9274325502), x_dir=(-0.7071067812, 0, 0.7071067812), z_dir=(0.7071067812, 0, 0.7071067812))):
        with BuildLine():
            ThreePointArc((0, -5.08), (5.08, 0), (0, 5.08))
            Line((0, 5.08), (0, -5.08))
        make_face()
    revolve(axis=Axis((45.72, -51.4603178334, -10.9274325502), (0, -1, 0)), mode=Mode.SUBTRACT)


with BuildPart() as f1_14:
    add(f1_13.part)

    # F8_t113: cut F8_tool114
    add(f8_tool114.part, mode=Mode.SUBTRACT)

    # F8_s119 → F8_t120 (revolve, cut)
    with BuildSketch(Plane.XZ.offset(61.6203178334)):
        with BuildLine():
            ThreePointArc((5.08, 22.0925674498), (1.4878975516, 23.5804650014), (0, 27.1725674498))
            Line((0, 27.1725674498), (0, 22.0925674498))
            Line((0, 22.0925674498), (5.08, 22.0925674498))
        make_face()
    revolve(axis=Axis((0, -61.6203178334, 17.0125674498), (-1, 0, 0)), revolution_arc=F8_T120_ANGLE, mode=Mode.SUBTRACT)

    # F8_s121 → F8_t122 (revolve, cut)
    with BuildSketch(Plane.XZ.offset(61.6203178334)):
        with BuildLine():
            ThreePointArc((45.72, 22.0925674498), (49.3121024484, 23.5804650014), (50.8, 27.1725674498))
            Line((50.8, 27.1725674498), (50.8, 22.0925674498))
            Line((50.8, 22.0925674498), (45.72, 22.0925674498))
        make_face()
    revolve(axis=Axis((50.8, -61.6203178334, 17.0125674498), (-1, 0, 0)), revolution_arc=F8_T122_ANGLE, mode=Mode.SUBTRACT)


solid = f1_14.part
